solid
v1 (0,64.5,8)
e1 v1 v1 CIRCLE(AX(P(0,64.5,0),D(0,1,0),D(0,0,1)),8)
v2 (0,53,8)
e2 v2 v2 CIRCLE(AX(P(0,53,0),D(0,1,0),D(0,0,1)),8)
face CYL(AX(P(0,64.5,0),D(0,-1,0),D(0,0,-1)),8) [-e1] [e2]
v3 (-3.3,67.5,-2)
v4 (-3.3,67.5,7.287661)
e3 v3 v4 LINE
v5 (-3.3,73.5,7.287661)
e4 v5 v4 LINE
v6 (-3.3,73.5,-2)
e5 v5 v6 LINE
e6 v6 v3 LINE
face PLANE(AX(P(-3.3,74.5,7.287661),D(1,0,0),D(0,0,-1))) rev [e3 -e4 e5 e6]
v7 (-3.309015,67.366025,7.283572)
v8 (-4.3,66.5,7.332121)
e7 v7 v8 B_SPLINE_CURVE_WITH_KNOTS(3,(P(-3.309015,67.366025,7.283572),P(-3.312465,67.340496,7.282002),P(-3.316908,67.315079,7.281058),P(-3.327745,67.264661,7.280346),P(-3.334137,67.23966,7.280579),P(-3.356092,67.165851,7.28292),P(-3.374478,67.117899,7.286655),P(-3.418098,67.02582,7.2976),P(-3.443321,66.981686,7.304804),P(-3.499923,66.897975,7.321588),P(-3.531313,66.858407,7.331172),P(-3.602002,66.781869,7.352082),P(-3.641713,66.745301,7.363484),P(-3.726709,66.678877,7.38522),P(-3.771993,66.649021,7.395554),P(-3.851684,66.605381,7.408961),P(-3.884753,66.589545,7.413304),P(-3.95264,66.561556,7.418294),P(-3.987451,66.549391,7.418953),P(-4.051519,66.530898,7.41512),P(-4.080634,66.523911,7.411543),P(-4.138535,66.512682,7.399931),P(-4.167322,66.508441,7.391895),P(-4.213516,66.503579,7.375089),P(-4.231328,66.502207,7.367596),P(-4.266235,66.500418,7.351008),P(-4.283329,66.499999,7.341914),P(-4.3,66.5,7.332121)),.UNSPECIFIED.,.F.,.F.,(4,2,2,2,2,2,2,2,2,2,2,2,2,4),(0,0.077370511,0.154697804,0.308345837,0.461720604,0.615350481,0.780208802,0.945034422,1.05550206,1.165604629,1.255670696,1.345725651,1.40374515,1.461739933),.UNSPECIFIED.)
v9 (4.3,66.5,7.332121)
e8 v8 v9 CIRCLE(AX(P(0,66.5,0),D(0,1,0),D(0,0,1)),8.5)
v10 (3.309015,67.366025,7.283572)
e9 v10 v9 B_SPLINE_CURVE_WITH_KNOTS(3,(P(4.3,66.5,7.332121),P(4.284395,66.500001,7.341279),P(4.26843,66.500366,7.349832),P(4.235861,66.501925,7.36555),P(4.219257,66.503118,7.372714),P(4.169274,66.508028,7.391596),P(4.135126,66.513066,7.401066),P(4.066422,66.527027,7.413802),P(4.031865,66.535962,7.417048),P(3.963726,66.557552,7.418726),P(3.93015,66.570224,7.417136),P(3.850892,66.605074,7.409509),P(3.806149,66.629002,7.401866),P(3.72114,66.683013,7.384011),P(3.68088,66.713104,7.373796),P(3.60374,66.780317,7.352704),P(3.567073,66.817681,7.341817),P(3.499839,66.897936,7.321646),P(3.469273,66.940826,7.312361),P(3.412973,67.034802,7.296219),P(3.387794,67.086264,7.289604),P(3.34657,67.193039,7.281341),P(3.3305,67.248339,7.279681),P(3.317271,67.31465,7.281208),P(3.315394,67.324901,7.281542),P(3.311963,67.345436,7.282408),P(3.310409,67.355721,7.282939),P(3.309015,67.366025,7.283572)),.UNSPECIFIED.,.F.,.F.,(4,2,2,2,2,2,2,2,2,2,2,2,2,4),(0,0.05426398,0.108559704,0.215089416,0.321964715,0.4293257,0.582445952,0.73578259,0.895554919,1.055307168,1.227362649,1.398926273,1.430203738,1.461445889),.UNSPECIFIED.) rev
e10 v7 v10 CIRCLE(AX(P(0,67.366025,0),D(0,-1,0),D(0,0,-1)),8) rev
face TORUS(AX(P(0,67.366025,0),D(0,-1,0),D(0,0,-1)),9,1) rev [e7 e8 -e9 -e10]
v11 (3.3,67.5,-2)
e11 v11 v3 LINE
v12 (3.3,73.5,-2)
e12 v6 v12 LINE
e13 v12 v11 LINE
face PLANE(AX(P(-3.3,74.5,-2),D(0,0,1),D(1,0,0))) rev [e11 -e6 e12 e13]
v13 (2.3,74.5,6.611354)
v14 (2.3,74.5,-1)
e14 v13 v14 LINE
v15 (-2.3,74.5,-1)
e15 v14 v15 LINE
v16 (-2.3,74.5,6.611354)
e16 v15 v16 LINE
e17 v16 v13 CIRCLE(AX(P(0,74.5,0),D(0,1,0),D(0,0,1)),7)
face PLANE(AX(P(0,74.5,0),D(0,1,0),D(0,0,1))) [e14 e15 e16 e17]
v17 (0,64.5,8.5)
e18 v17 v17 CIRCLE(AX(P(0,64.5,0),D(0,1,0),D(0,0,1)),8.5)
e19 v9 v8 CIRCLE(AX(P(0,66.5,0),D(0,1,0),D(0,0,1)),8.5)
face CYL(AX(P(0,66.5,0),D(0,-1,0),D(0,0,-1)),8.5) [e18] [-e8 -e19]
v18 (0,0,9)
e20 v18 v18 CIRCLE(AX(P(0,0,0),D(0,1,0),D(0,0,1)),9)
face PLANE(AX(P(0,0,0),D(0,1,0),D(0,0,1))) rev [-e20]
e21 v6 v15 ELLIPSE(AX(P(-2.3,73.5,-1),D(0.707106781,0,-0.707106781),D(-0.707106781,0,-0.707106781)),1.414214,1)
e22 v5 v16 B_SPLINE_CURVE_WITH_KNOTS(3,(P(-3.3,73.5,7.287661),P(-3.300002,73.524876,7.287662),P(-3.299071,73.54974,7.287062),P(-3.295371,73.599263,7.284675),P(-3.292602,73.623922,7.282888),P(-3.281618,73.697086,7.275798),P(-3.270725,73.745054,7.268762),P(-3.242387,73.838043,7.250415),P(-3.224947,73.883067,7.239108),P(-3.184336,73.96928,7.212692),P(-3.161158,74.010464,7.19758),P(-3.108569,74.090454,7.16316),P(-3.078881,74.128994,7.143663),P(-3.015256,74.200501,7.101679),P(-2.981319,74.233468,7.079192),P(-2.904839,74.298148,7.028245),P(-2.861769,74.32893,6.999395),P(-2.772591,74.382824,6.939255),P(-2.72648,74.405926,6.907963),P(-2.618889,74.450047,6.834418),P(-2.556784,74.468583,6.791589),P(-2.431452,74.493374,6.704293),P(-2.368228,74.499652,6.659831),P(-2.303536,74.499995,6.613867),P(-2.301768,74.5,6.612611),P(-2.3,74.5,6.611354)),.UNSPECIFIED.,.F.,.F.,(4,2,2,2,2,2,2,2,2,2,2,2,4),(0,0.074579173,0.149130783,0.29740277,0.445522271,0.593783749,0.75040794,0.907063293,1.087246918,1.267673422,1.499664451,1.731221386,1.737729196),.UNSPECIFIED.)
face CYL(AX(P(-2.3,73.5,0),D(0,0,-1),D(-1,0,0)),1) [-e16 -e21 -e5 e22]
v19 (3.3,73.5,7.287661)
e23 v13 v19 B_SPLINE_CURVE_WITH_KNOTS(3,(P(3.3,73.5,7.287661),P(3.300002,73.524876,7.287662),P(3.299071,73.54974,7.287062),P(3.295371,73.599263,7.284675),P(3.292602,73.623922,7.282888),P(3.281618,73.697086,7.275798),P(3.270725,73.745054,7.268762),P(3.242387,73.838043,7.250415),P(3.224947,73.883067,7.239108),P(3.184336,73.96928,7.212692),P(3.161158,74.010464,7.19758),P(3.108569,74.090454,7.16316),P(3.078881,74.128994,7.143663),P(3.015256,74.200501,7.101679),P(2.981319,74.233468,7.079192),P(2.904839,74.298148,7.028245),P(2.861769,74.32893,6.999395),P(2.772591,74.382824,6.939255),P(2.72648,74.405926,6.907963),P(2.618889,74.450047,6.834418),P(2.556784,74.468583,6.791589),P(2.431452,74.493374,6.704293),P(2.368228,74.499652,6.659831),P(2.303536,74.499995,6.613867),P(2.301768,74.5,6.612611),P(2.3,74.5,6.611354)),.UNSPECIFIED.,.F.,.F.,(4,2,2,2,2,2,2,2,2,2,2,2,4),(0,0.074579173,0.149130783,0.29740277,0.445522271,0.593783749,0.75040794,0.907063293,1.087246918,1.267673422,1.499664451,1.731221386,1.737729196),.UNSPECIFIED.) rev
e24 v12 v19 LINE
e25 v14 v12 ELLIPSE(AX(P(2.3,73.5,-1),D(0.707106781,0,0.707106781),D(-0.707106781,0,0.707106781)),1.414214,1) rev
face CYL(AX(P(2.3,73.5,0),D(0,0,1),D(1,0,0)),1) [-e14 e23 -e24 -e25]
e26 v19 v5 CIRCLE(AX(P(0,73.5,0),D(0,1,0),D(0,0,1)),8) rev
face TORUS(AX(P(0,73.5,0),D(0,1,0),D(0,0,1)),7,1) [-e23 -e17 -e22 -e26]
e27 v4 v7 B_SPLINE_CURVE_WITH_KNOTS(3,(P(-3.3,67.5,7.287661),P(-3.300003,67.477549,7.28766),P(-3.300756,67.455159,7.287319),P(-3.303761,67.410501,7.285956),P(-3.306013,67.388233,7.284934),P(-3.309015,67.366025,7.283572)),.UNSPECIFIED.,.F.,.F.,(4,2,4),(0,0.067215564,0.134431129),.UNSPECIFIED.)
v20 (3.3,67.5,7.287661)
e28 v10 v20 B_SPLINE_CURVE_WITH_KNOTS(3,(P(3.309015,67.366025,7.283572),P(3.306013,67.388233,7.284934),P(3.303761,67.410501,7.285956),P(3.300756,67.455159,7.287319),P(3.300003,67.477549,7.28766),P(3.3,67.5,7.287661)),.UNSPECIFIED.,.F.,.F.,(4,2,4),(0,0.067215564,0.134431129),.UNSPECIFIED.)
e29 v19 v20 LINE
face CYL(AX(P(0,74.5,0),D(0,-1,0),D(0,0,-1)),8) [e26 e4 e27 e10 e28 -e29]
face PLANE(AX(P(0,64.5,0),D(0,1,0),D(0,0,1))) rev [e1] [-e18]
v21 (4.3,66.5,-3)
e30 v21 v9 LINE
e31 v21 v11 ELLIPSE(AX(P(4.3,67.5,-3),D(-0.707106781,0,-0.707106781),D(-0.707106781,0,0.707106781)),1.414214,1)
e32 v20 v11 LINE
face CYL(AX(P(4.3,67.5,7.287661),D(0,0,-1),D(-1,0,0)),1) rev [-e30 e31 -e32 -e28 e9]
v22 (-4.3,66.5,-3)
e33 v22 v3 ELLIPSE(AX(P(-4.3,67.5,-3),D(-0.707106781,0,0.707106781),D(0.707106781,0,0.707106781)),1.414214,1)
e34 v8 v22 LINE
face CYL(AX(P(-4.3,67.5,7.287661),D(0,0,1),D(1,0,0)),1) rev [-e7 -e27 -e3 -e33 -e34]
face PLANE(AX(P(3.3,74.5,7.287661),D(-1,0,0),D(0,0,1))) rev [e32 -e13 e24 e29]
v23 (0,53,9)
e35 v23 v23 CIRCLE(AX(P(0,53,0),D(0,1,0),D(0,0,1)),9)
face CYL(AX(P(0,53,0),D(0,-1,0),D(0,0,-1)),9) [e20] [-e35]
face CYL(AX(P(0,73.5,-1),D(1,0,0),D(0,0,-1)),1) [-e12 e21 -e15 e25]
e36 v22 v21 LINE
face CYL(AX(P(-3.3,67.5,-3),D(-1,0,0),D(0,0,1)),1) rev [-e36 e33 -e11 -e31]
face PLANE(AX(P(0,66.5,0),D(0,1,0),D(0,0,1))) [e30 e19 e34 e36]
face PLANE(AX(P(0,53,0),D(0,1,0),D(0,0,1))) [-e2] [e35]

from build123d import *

# Parameters (mm, degrees)
CROQUIS1_R              = 9
SALIENTE_EXTRUIR1_DEPTH = 53
CROQUIS2_R              = 8
SALIENTE_EXTRUIR2_DEPTH = 11.5
CROQUIS3_R              = 8.5
SALIENTE_EXTRUIR3_DEPTH = 2
SALIENTE_EXTRUIR4_DEPTH = 8
REDONDEO1_R             = 1
REDONDEO2_R             = 1


with BuildPart() as part:
    # Croquis1 → Saliente-Extruir1 (new body)
    with BuildSketch(Plane(origin=(0, 0, 0), x_dir=(1, 0, 0), z_dir=(0, 1, 0))):
        with Locations(Location((0, 0, 0), (0, 0, 270))):
            Circle(CROQUIS1_R)
    extrude(amount=SALIENTE_EXTRUIR1_DEPTH)

    # Croquis2 → Saliente-Extruir2 (add)
    with BuildSketch(Plane(origin=(0, 53, 0), x_dir=(1, 0, 0), z_dir=(0, 1, 0))):
        with Locations(Location((0, 0, 0), (0, 0, 270))):
            Circle(CROQUIS2_R)
    extrude(amount=SALIENTE_EXTRUIR2_DEPTH)

    # Croquis3 → Saliente-Extruir3 (add)
    with BuildSketch(Plane(origin=(0, 64.5, 0), x_dir=(1, 0, 0), z_dir=(0, 1, 0))):
        with Locations(Location((0, 0, 0), (0, 0, 270))):
            Circle(CROQUIS3_R)
    extrude(amount=SALIENTE_EXTRUIR3_DEPTH)

    # Croquis4 → Saliente-Extruir4 (add)
    with BuildSketch(Plane(origin=(0, 66.5, 0), x_dir=(1, 0, 0), z_dir=(0, 1, 0))):
        with BuildLine():
            Line((-3.3, -7.287660804), (-3.3, 2))
            Line((-3.3, 2), (3.3, 2))
            Line((3.3, 2), (3.3, -7.287660804))
            ThreePointArc((3.3, -7.287660804), (0, -8), (-3.3, -7.287660804))
        make_face()
    extrude(amount=SALIENTE_EXTRUIR4_DEPTH)

    # Redondeo1
    # the kernel refuses this fillet: 1 mm, written as the material it adds along each edge
    with BuildSketch(Plane(origin=(0, 66.5, 0), x_dir=(0.6410468977600248, 0, 0.7675017100125893), z_dir=(0.7675017100125893, 0, -0.6410468977600248))) as redondeo1_piece_1_section:
        with BuildLine():
            CenterArc((9, -0.866025404), REDONDEO1_R, 120, 60)
            Line((8, -0.866025404), (7.98, -0.866025404))
            Line((7.98, -0.866025404), (7.98, 0))
            Line((7.98, 0), (8, 0.02))
            ThreePointArc((8, 0.02), (8.25, 0.02), (8.49, 0.017320508))
            Line((8.49, 0.017320508), (8.5, 0))
        make_face()
    redondeo1_piece_1 = revolve(axis=Axis((0, 66.5, 0), (0, -1, 0)), revolution_arc=79.739856792, mode=Mode.PRIVATE)
    redondeo1_piece_1 = split(redondeo1_piece_1, bisect_by=Plane(origin=(3.3, 66.860958569, 8.125198581), z_dir=(-1, 0, 0)), keep=Keep.TOP, mode=Mode.PRIVATE)
    redondeo1_piece_1 = split(redondeo1_piece_1, bisect_by=Plane(origin=(-3.3, 66.860958569, 8.125198581), z_dir=(1, 0, 0)), keep=Keep.TOP, mode=Mode.PRIVATE)
    add(redondeo1_piece_1)
    with BuildSketch(Plane(origin=(3.3, 66.5, -2), x_dir=(1, 0, 0), z_dir=(0, 0, 1))) as redondeo1_piece_2_section:
        with BuildLine():
            CenterArc((REDONDEO1_R, REDONDEO1_R), REDONDEO1_R, 180, 90)
            Line((0, REDONDEO1_R), (-REDONDEO1_R * 0.02, REDONDEO1_R))
            Line((-REDONDEO1_R * 0.02, REDONDEO1_R), (-REDONDEO1_R * 0.02, -REDONDEO1_R * 0.02))
            Line((-REDONDEO1_R * 0.02, -REDONDEO1_R * 0.02), (REDONDEO1_R, -REDONDEO1_R * 0.02))
            Line((REDONDEO1_R, -REDONDEO1_R * 0.02), (REDONDEO1_R, 0))
        make_face()
    redondeo1_piece_2 = extrude(amount=11.787660804, mode=Mode.PRIVATE)
    redondeo1_piece_2 = redondeo1_piece_2 & Plane(origin=(0, 66.727902146, 0), x_dir=(0.4124999999999996, 0, 0.9109576005501028), z_dir=(0, -1, 0)) * Cylinder(8, 28, mode=Mode.PRIVATE)
    add(redondeo1_piece_2)
    with BuildSketch(Plane(origin=(-3.3, 66.5, -2), x_dir=(0, 0, -1), z_dir=(1, 0, 0))) as redondeo1_piece_3:
        with BuildLine():
            CenterArc((REDONDEO1_R, REDONDEO1_R), REDONDEO1_R, 180, 90)
            Line((0, REDONDEO1_R), (-REDONDEO1_R * 0.02, REDONDEO1_R))
            Line((-REDONDEO1_R * 0.02, REDONDEO1_R), (-REDONDEO1_R * 0.02, -REDONDEO1_R * 0.02))
            Line((-REDONDEO1_R * 0.02, -REDONDEO1_R * 0.02), (REDONDEO1_R, -REDONDEO1_R * 0.02))
            Line((REDONDEO1_R, -REDONDEO1_R * 0.02), (REDONDEO1_R, 0))
        make_face()
    extrude(amount=6.6)
    with BuildSketch(Plane(origin=(-3.3, 66.5, 9.787660804), x_dir=(-1, 0, 0), z_dir=(0, 0, -1))) as redondeo1_piece_4_section:
        with BuildLine():
            CenterArc((REDONDEO1_R, REDONDEO1_R), REDONDEO1_R, 180, 90)
            Line((0, REDONDEO1_R), (-REDONDEO1_R * 0.02, REDONDEO1_R))
            Line((-REDONDEO1_R * 0.02, REDONDEO1_R), (-REDONDEO1_R * 0.02, -REDONDEO1_R * 0.02))
            Line((-REDONDEO1_R * 0.02, -REDONDEO1_R * 0.02), (REDONDEO1_R, -REDONDEO1_R * 0.02))
            Line((REDONDEO1_R, -REDONDEO1_R * 0.02), (REDONDEO1_R, 0))
        make_face()
    redondeo1_piece_4 = extrude(amount=11.787660804, mode=Mode.PRIVATE)
    redondeo1_piece_4 = redondeo1_piece_4 & Plane(origin=(0, 66.727902035, 0), x_dir=(0.4124999999999996, 0, 0.9109576005501028), z_dir=(0, -1, 0)) * Cylinder(8, 28, mode=Mode.PRIVATE)
    add(redondeo1_piece_4)
    with BuildSketch(Plane(origin=(0, 66.5, 0), x_dir=(0.6410468977600248, 0, 0.7675017100125893), z_dir=(0.7675017100125893, 0, -0.6410468977600248))) as redondeo1_piece_5a_section:
        with BuildLine():
            CenterArc((9, -0.866025404), REDONDEO1_R, 120, 60)
            Line((8, -0.866025404), (7.98, -0.866025404))
            Line((7.98, -0.866025404), (7.98, 0))
            Line((7.98, 0), (8, 0.02))
            ThreePointArc((8, 0.02), (8.25, 0.02), (8.49, 0.017320508))
            Line((8.49, 0.017320508), (8.5, 0))
        make_face()
    redondeo1_piece_5a = revolve(axis=Axis((0, 66.5, 0), (0, -1, 0)), revolution_arc=79.739856792, mode=Mode.PRIVATE)
    redondeo1_piece_5a = split(redondeo1_piece_5a, bisect_by=Plane(origin=(3.3, 66.711912265, 6.883204996), z_dir=(1, 0, 0)), keep=Keep.TOP, mode=Mode.PRIVATE)
    with BuildSketch(Plane(origin=(3.3, 66.5, -2), x_dir=(1, 0, 0), z_dir=(0, 0, 1))) as redondeo1_piece_5b_section:
        with BuildLine():
            CenterArc((REDONDEO1_R, REDONDEO1_R), REDONDEO1_R, 180, 90)
            Line((0, REDONDEO1_R), (-REDONDEO1_R * 0.02, REDONDEO1_R))
            Line((-REDONDEO1_R * 0.02, REDONDEO1_R), (-REDONDEO1_R * 0.02, -REDONDEO1_R * 0.02))
            Line((-REDONDEO1_R * 0.02, -REDONDEO1_R * 0.02), (REDONDEO1_R, -REDONDEO1_R * 0.02))
            Line((REDONDEO1_R, -REDONDEO1_R * 0.02), (REDONDEO1_R, 0))
        make_face()
    redondeo1_piece_5b = extrude(amount=11.787660804, mode=Mode.PRIVATE)
    redondeo1_piece_5b = redondeo1_piece_5b & Plane(origin=(0, 66.724587575, 0), x_dir=(0, 0, 1), z_dir=(0, -1, 0)) * Cylinder(8.5, 28, mode=Mode.PRIVATE)
    redondeo1_piece_5b = redondeo1_piece_5b - Plane(origin=(0, 66.724587575, 0), x_dir=(0.4124999999999996, 0, 0.9109576005501028), z_dir=(0, -1, 0)) * Cylinder(8, 28, mode=Mode.PRIVATE)
    redondeo1_piece_5 = redondeo1_piece_5a & redondeo1_piece_5b
    add(redondeo1_piece_5)
    with BuildSketch(Plane(origin=(0, 66.5, 0), x_dir=(0.6410468977600248, 0, 0.7675017100125893), z_dir=(0.7675017100125893, 0, -0.6410468977600248))) as redondeo1_piece_6a_section:
        with BuildLine():
            CenterArc((9, -0.866025404), REDONDEO1_R, 120, 60)
            Line((8, -0.866025404), (7.98, -0.866025404))
            Line((7.98, -0.866025404), (7.98, 0))
            Line((7.98, 0), (8, 0.02))
            ThreePointArc((8, 0.02), (8.25, 0.02), (8.49, 0.017320508))
            Line((8.49, 0.017320508), (8.5, 0))
        make_face()
    redondeo1_piece_6a = revolve(axis=Axis((0, 66.5, 0), (0, -1, 0)), revolution_arc=79.739856792, mode=Mode.PRIVATE)
    redondeo1_piece_6a = split(redondeo1_piece_6a, bisect_by=Plane(origin=(-3.3, 66.71191226, 6.883204989), z_dir=(-1, 0, 0)), keep=Keep.TOP, mode=Mode.PRIVATE)
    with BuildSketch(Plane(origin=(-3.3, 66.5, 9.787660804), x_dir=(-1, 0, 0), z_dir=(0, 0, -1))) as redondeo1_piece_6b_section:
        with BuildLine():
            CenterArc((REDONDEO1_R, REDONDEO1_R), REDONDEO1_R, 180, 90)
            Line((0, REDONDEO1_R), (-REDONDEO1_R * 0.02, REDONDEO1_R))
            Line((-REDONDEO1_R * 0.02, REDONDEO1_R), (-REDONDEO1_R * 0.02, -REDONDEO1_R * 0.02))
            Line((-REDONDEO1_R * 0.02, -REDONDEO1_R * 0.02), (REDONDEO1_R, -REDONDEO1_R * 0.02))
            Line((REDONDEO1_R, -REDONDEO1_R * 0.02), (REDONDEO1_R, 0))
        make_face()
    redondeo1_piece_6b = extrude(amount=11.787660804, mode=Mode.PRIVATE)
    redondeo1_piece_6b = redondeo1_piece_6b & Plane(origin=(0, 66.72458755, 0), x_dir=(0, 0, 1), z_dir=(0, -1, 0)) * Cylinder(8.5, 28, mode=Mode.PRIVATE)
    redondeo1_piece_6b = redondeo1_piece_6b - Plane(origin=(0, 66.72458755, 0), x_dir=(0.4124999999999996, 0, 0.9109576005501028), z_dir=(0, -1, 0)) * Cylinder(8, 28, mode=Mode.PRIVATE)
    redondeo1_piece_6 = redondeo1_piece_6a & redondeo1_piece_6b
    add(redondeo1_piece_6)
    with BuildSketch(Plane(origin=(3.3, 66.5, -4.5), x_dir=(1, 0, 0), z_dir=(0, 0, 1))) as redondeo1_piece_7a_section:
        with BuildLine():
            CenterArc((REDONDEO1_R, REDONDEO1_R), REDONDEO1_R, 180, 90)
            Line((0, REDONDEO1_R), (-REDONDEO1_R * 0.02, REDONDEO1_R))
            Line((-REDONDEO1_R * 0.02, REDONDEO1_R), (-REDONDEO1_R * 0.02, -REDONDEO1_R * 0.02))
            Line((-REDONDEO1_R * 0.02, -REDONDEO1_R * 0.02), (REDONDEO1_R, -REDONDEO1_R * 0.02))
            Line((REDONDEO1_R, -REDONDEO1_R * 0.02), (REDONDEO1_R, 0))
        make_face()
    redondeo1_piece_7a = extrude(amount=14.287660804, mode=Mode.PRIVATE)
    redondeo1_piece_7a = split(redondeo1_piece_7a, bisect_by=Plane(origin=(3.526395114, 66.726395114, -2), z_dir=(0, 0, -1)), keep=Keep.TOP, mode=Mode.PRIVATE)
    with BuildSketch(Plane(origin=(-3.3, 66.5, -2), x_dir=(0, 0, -1), z_dir=(1, 0, 0))) as redondeo1_piece_7b_section:
        with BuildLine():
            CenterArc((REDONDEO1_R, REDONDEO1_R), REDONDEO1_R, 180, 90)
            Line((0, REDONDEO1_R), (-REDONDEO1_R * 0.02, REDONDEO1_R))
            Line((-REDONDEO1_R * 0.02, REDONDEO1_R), (-REDONDEO1_R * 0.02, -REDONDEO1_R * 0.02))
            Line((-REDONDEO1_R * 0.02, -REDONDEO1_R * 0.02), (REDONDEO1_R, -REDONDEO1_R * 0.02))
            Line((REDONDEO1_R, -REDONDEO1_R * 0.02), (REDONDEO1_R, 0))
        make_face()
    redondeo1_piece_7b = extrude(amount=9.1, mode=Mode.PRIVATE)
    redondeo1_piece_7b = split(redondeo1_piece_7b, bisect_by=Plane(origin=(3.3, 66.726395114, -2.226395114), z_dir=(1, 0, 0)), keep=Keep.TOP, mode=Mode.PRIVATE)
    redondeo1_piece_7 = redondeo1_piece_7a & redondeo1_piece_7b
    add(redondeo1_piece_7)
    with BuildSketch(Plane(origin=(-5.8, 66.5, -2), x_dir=(0, 0, -1), z_dir=(1, 0, 0))) as redondeo1_piece_8a_section:
        with BuildLine():
            CenterArc((REDONDEO1_R, REDONDEO1_R), REDONDEO1_R, 180, 90)
            Line((0, REDONDEO1_R), (-REDONDEO1_R * 0.02, REDONDEO1_R))
            Line((-REDONDEO1_R * 0.02, REDONDEO1_R), (-REDONDEO1_R * 0.02, -REDONDEO1_R * 0.02))
            Line((-REDONDEO1_R * 0.02, -REDONDEO1_R * 0.02), (REDONDEO1_R, -REDONDEO1_R * 0.02))
            Line((REDONDEO1_R, -REDONDEO1_R * 0.02), (REDONDEO1_R, 0))
        make_face()
    redondeo1_piece_8a = extrude(amount=9.1, mode=Mode.PRIVATE)
    redondeo1_piece_8a = split(redondeo1_piece_8a, bisect_by=Plane(origin=(-3.3, 66.726395114, -2.226395114), z_dir=(-1, 0, 0)), keep=Keep.TOP, mode=Mode.PRIVATE)
    with BuildSketch(Plane(origin=(-3.3, 66.5, 9.787660804), x_dir=(-1, 0, 0), z_dir=(0, 0, -1))) as redondeo1_piece_8b_section:
        with BuildLine():
            CenterArc((REDONDEO1_R, REDONDEO1_R), REDONDEO1_R, 180, 90)
            Line((0, REDONDEO1_R), (-REDONDEO1_R * 0.02, REDONDEO1_R))
            Line((-REDONDEO1_R * 0.02, REDONDEO1_R), (-REDONDEO1_R * 0.02, -REDONDEO1_R * 0.02))
            Line((-REDONDEO1_R * 0.02, -REDONDEO1_R * 0.02), (REDONDEO1_R, -REDONDEO1_R * 0.02))
            Line((REDONDEO1_R, -REDONDEO1_R * 0.02), (REDONDEO1_R, 0))
        make_face()
    redondeo1_piece_8b = extrude(amount=14.287660804, mode=Mode.PRIVATE)
    redondeo1_piece_8b = split(redondeo1_piece_8b, bisect_by=Plane(origin=(-3.526395114, 66.726395114, -2), z_dir=(0, 0, -1)), keep=Keep.TOP, mode=Mode.PRIVATE)
    redondeo1_piece_8 = redondeo1_piece_8a & redondeo1_piece_8b
    add(redondeo1_piece_8)

    # Redondeo2
    redondeo2_edges = [part.edges().sort_by_distance(p)[0] for p in [
        (0, 74.5, 8),
        (3.3, 74.5, 2.643830402),
        (0, 74.5, -2),
        (-3.3, 74.5, 2.643830402),
    ]]
    fillet(redondeo2_edges, radius=REDONDEO2_R)


solid = part.part
